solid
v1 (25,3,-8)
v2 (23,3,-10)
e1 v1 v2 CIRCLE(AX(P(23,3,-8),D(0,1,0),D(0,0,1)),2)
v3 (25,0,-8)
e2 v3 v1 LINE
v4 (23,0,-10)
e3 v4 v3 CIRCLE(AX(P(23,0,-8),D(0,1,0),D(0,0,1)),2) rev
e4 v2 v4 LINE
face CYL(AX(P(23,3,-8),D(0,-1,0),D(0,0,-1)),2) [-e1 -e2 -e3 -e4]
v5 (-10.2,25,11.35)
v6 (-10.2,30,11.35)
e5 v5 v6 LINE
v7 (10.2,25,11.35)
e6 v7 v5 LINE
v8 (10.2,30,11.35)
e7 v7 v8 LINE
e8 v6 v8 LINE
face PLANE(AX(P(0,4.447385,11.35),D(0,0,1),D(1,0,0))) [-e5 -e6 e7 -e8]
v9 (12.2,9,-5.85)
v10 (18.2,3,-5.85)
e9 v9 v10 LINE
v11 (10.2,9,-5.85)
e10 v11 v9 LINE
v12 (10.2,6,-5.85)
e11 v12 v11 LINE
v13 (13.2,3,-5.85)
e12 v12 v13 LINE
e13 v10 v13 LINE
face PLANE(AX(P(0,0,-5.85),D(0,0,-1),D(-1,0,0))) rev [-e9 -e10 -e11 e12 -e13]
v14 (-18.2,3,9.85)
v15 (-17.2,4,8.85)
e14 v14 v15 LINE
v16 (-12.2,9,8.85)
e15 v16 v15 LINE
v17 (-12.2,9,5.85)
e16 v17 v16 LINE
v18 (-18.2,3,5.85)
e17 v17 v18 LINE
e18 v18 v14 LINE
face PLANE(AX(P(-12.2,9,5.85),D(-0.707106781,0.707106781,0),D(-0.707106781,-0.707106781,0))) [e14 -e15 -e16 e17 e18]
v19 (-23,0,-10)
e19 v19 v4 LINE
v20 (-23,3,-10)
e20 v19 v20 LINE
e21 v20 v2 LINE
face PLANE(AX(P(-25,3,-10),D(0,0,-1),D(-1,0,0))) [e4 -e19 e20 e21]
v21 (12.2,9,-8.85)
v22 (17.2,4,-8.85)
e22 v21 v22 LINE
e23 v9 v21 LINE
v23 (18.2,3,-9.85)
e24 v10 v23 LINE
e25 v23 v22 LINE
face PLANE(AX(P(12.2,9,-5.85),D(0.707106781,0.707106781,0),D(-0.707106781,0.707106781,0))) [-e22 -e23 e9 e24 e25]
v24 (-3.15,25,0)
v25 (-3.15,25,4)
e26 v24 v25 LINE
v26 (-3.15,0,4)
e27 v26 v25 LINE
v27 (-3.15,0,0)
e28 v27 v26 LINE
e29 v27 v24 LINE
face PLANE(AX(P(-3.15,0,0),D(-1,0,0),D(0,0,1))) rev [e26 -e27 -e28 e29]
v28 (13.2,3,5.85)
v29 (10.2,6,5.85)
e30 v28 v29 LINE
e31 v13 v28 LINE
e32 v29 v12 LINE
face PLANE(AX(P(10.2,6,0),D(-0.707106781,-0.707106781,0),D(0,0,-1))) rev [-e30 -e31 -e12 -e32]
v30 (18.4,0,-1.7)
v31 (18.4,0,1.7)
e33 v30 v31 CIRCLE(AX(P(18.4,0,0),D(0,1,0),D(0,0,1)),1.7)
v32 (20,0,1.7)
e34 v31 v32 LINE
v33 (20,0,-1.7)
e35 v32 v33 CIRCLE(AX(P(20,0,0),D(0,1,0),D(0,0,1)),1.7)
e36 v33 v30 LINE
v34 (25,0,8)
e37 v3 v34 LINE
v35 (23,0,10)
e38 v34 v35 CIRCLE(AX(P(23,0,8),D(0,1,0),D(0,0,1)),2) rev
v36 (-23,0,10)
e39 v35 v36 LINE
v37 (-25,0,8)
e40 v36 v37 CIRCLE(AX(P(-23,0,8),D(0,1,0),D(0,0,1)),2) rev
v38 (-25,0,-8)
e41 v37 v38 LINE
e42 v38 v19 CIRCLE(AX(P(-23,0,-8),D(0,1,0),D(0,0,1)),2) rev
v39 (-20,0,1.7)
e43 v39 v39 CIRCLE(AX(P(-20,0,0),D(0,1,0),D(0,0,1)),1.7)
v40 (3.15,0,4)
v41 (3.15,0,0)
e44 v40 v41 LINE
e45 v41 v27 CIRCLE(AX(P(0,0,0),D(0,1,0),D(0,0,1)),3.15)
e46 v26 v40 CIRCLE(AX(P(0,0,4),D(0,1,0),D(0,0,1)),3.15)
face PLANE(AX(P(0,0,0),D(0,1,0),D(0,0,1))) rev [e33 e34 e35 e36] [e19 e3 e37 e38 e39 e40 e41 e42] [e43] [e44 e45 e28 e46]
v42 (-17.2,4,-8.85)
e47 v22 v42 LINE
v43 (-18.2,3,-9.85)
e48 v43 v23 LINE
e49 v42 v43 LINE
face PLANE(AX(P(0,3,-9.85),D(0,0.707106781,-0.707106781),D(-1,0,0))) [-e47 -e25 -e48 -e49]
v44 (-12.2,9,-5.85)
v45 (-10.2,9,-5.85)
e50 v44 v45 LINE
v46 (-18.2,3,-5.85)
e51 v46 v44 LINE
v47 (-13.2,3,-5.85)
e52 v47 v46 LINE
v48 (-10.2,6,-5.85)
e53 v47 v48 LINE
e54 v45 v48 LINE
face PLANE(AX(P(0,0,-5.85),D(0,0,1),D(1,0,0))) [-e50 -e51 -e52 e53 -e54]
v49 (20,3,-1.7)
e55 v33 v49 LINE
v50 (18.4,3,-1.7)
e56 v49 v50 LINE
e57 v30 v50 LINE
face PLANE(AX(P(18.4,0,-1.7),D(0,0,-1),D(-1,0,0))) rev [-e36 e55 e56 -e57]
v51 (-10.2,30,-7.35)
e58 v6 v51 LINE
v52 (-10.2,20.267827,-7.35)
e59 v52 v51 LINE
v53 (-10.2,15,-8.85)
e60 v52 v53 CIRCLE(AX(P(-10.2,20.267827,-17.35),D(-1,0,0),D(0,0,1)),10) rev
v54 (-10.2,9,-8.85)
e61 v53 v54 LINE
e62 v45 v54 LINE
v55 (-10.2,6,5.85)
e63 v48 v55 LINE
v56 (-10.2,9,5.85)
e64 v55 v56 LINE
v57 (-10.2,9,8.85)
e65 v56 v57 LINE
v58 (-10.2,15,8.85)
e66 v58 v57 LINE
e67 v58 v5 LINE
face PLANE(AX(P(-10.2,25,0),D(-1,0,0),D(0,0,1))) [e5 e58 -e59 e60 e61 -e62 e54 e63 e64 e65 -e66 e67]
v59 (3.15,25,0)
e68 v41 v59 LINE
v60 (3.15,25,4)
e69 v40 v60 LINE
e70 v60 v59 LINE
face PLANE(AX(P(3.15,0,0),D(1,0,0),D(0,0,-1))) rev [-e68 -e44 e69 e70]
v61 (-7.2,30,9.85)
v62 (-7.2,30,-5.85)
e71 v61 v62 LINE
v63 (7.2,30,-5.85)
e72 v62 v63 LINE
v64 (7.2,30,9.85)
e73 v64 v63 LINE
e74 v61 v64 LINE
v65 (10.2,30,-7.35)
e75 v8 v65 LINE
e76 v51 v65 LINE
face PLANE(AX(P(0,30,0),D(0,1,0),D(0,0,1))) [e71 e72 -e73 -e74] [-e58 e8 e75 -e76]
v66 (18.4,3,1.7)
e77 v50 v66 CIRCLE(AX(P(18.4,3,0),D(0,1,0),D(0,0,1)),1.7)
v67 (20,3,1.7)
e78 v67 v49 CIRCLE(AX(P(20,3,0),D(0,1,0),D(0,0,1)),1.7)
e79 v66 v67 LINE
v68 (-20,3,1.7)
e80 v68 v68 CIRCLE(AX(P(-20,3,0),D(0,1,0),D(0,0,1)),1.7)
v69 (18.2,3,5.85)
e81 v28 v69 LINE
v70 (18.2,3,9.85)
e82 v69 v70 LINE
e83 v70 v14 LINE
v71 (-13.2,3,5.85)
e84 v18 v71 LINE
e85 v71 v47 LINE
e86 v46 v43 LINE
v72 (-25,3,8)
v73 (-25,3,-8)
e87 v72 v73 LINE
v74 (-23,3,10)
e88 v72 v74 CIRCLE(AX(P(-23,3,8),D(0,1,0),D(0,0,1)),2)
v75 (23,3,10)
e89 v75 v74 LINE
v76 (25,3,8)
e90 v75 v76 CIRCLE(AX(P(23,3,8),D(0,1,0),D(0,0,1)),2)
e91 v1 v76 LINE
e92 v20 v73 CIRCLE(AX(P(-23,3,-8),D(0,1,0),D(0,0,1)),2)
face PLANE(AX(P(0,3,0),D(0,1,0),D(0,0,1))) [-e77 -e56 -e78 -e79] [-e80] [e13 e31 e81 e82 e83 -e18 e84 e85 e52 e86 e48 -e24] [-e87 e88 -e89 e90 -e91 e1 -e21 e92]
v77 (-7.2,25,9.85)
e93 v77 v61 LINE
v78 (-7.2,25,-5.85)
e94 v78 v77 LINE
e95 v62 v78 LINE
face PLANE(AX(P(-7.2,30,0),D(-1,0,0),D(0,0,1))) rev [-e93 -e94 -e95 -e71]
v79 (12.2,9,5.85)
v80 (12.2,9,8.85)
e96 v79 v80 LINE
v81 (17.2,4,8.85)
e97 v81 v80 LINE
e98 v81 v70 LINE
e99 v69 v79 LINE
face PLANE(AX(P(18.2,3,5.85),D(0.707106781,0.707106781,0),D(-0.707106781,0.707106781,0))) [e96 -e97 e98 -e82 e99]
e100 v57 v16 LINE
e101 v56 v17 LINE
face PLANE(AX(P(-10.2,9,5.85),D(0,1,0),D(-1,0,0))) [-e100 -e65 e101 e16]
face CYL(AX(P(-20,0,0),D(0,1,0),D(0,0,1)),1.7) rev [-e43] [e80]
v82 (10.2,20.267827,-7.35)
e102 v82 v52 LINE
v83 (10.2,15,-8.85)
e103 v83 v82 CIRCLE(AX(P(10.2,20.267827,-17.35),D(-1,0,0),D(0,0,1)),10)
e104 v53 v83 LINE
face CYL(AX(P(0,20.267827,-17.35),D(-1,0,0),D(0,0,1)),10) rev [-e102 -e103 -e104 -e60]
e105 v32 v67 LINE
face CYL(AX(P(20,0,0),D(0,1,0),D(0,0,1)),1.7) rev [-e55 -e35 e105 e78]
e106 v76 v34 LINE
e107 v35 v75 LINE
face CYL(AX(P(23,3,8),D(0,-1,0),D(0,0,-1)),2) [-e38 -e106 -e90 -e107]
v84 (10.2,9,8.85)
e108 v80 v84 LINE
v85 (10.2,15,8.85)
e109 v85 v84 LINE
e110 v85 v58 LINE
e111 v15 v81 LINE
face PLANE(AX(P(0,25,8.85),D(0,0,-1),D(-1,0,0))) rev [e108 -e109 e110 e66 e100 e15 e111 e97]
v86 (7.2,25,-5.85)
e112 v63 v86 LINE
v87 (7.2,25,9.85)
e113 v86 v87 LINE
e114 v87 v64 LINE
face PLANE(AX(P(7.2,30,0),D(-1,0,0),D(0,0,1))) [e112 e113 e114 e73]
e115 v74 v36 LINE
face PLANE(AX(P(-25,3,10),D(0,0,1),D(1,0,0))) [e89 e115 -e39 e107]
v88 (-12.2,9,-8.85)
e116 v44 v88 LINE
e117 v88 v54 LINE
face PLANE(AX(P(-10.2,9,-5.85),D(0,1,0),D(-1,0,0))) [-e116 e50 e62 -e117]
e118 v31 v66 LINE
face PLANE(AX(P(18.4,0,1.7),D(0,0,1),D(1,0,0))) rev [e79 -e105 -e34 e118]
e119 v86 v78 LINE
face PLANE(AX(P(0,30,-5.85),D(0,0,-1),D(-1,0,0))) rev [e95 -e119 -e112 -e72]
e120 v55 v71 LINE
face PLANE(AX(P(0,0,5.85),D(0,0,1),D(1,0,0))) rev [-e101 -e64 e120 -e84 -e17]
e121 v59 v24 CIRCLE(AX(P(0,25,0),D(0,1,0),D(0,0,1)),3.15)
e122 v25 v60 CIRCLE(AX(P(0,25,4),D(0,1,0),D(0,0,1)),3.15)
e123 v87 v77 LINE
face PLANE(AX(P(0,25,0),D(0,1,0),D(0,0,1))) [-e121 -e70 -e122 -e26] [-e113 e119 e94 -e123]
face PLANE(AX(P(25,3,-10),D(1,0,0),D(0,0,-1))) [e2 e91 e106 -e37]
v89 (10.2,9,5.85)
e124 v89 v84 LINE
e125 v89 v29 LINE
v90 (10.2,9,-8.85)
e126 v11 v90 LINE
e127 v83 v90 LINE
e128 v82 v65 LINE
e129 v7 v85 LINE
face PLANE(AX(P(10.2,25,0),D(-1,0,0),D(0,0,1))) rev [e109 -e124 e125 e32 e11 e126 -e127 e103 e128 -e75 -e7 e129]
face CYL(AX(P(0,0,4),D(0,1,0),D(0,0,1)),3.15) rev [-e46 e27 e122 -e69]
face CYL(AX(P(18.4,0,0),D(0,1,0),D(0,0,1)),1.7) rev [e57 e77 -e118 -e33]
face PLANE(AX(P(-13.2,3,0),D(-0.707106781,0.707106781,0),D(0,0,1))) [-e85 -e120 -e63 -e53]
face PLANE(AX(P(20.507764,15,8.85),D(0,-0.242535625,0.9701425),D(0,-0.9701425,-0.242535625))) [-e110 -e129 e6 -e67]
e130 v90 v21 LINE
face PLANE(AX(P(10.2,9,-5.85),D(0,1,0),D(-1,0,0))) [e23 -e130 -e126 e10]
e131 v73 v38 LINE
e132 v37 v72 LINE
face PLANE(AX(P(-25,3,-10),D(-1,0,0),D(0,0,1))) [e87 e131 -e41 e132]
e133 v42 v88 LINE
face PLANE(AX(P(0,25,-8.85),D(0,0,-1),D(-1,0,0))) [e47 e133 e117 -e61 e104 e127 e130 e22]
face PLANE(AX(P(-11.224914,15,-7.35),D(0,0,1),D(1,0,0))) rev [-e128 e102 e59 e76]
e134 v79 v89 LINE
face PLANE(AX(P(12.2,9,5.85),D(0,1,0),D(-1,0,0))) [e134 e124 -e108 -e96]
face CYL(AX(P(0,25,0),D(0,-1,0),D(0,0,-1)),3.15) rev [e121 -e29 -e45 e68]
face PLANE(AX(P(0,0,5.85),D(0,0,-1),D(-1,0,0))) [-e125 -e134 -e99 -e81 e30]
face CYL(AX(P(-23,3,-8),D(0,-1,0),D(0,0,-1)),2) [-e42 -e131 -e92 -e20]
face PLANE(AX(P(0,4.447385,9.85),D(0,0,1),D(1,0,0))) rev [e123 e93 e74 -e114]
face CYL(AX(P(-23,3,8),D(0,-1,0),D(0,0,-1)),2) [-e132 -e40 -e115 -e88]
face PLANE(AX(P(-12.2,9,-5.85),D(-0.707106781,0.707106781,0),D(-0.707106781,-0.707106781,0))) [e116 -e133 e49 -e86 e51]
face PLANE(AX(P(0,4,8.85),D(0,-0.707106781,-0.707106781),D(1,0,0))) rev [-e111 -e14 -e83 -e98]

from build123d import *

# Parameters (mm, degrees)
SKETCH1_W               = 20.4
SKETCH1_H               = 17.7
SKETCH1_W_2             = 14.4
SKETCH1_H_2             = 11.7
SKETCH1_R               = 3.15
BOSS_EXTRUDE1_DEPTH     = 25
SKETCH1_3_W             = 20.4
SKETCH1_3_H             = 17.7
SKETCH1_3_W_2           = 14.4
SKETCH1_3_H_2           = 11.7
BOSS_EXTRUDE2_DEPTH     = 30
SKETCH2_W               = 22.449827962
SKETCH2_H               = 3
CUT_EXTRUDE1_DEPTH      = 15
FILLET1_R               = 10
SKETCH3_W               = 50
SKETCH3_H               = 20
SKETCH3_R               = 3.15
BOSS_EXTRUDE3_DEPTH     = 3
SKETCH4_R               = 1.7
CUT_EXTRUDE2_DEPTH      = 39.13135193
BOSS_EXTRUDE4_DEPTH     = 3
BOSS_EXTRUDE5_DEPTH     = 3
CHAMFER1_SIZE           = 3
CHAMFER2_SIZE           = 1
FILLET3_R               = 2
SKETCH7_W               = 14.4
SKETCH7_H               = 3
CUT_EXTRUDE3_DEPTH      = 5
BOSS_EXTRUDE6_DEPTH     = 5
CUT_EXTRUDE4_DEPTH      = 38.132499243
CUT_EXTRUDE4_DEPTH_BACK = 38.132499243
BOSS_EXTRUDE7_DEPTH     = 20.4


with BuildPart() as part:
    # Sketch1 → Boss-Extrude1 (new body)
    # profile 1 of 2: a face of its own
    with BuildSketch(Plane(origin=(0, 0, 0), x_dir=(1, 0, 0), z_dir=(0, 1, 0))):
        Rectangle(SKETCH1_W, SKETCH1_H)
        Rectangle(SKETCH1_W_2, SKETCH1_H_2, mode=Mode.SUBTRACT)
    # profile 2 of 2: a face of its own
    with BuildSketch(Plane(origin=(0, 0, 0), x_dir=(1, 0, 0), z_dir=(0, 1, 0))):
        Rectangle(SKETCH1_W_2, SKETCH1_H_2)
        with Locations(Location((0, 0, 0), (0, 0, 270))):
            Circle(SKETCH1_R, mode=Mode.SUBTRACT)
    extrude(amount=BOSS_EXTRUDE1_DEPTH)

    # Sketch1<3> → Boss-Extrude2 (add)
    with BuildSketch(Plane(origin=(0, 0, 0), x_dir=(1, 0, 0), z_dir=(0, 1, 0))):
        Rectangle(SKETCH1_3_W, SKETCH1_3_H)
        Rectangle(SKETCH1_3_W_2, SKETCH1_3_H_2, mode=Mode.SUBTRACT)
    extrude(amount=BOSS_EXTRUDE2_DEPTH)

    # Sketch2 → Cut-Extrude1 (cut)
    with BuildSketch(Plane(origin=(0, 30, 0), x_dir=(1, 0, 0), z_dir=(0, 1, 0))):
        with Locations((0, 8.85)):
            Rectangle(SKETCH2_W, SKETCH2_H)
    extrude(amount=-CUT_EXTRUDE1_DEPTH, mode=Mode.SUBTRACT)

    # Fillet1
    # the kernel refuses this fillet: 10 mm, written as the material it adds along each edge
    with BuildSketch(Plane(origin=(10.2, 15, -7.35), x_dir=(0, 1, 0), z_dir=(-1, 0, 0))) as fillet1_piece_1:
        with BuildLine():
            CenterArc((5.267826876, 10), FILLET1_R, 238.211669383, 31.788330617)
            Line((0, 1.5), (-0.105356538, 1.33))
            ThreePointArc((-0.105356538, 1.33), (-0.2, 0.75), (-0.2, 0))
            Line((-0.2, 0), (0, -0.2))
            Line((0, -0.2), (5.267826876, -0.2))
            Line((5.267826876, -0.2), (5.267826876, 0))
        make_face()
    extrude(amount=20.4)

    # Sketch3 → Boss-Extrude3 (add)
    with BuildSketch(Plane.XZ):
        Rectangle(SKETCH3_W, SKETCH3_H)
        with Locations(Location((0, 0, 0), (0, 0, 90))):
            Circle(SKETCH3_R, mode=Mode.SUBTRACT)
    extrude(amount=-BOSS_EXTRUDE3_DEPTH)

    # Sketch4 → Cut-Extrude2 (cut, through all)
    with BuildSketch(Plane(origin=(0, 3, 0), x_dir=(1, 0, 0), z_dir=(0, 1, 0))):
        with Locations(Location((-20, 0, 0), (0, 0, 270))):
            Circle(SKETCH4_R)
        with BuildLine():
            Line((18.4, 1.7), (20, 1.7))
            ThreePointArc((20, 1.7), (21.7, 0), (20, -1.7))
            Line((20, -1.7), (18.4, -1.7))
            ThreePointArc((18.4, -1.7), (16.7, 0), (18.4, 1.7))
        make_face()
    extrude(amount=-CUT_EXTRUDE2_DEPTH, mode=Mode.SUBTRACT)

    # Sketch5 → Boss-Extrude4 (add)
    with BuildSketch(Plane(origin=(0, 0, -8.85), x_dir=(-1, 0, 0), z_dir=(0, 0, -1))):
        Polygon((-10.2, 3), (-10.2, 9), (-12.2, 9), (-18.2, 3), align=None)
        Polygon((18.2, 3), (10.2, 3), (10.2, 9), (12.2, 9), align=None)
    extrude(amount=-BOSS_EXTRUDE4_DEPTH)

    # Sketch6 → Boss-Extrude5 (add)
    with BuildSketch(Plane.XY.offset(8.85)):
        Polygon((-18.2, 3), (-10.2, 3), (-10.2, 9), (-12.2, 9), align=None)
        Polygon((10.2, 9), (10.2, 3), (18.2, 3), (12.2, 9), align=None)
    extrude(amount=-BOSS_EXTRUDE5_DEPTH)

    # Chamfer1
    chamfer1_edges = [part.edges().sort_by_distance(p)[0] for p in [
        (-10.2, 3, 0),
        (10.2, 3, 0),
    ]]
    chamfer(chamfer1_edges, length=CHAMFER1_SIZE)

    # Chamfer2
    chamfer2_edges = [part.edges().sort_by_distance(p)[0] for p in [
        (0, 3, -8.85),
        (0, 3, 8.85),
    ]]
    chamfer(chamfer2_edges, length=CHAMFER2_SIZE)

    # Fillet3
    fillet3_edges = [part.edges().sort_by_distance(p)[0] for p in [
        (25, 1.5, 10),
        (25, 1.5, -10),
        (-25, 1.5, -10),
        (-25, 1.5, 10),
    ]]
    fillet(fillet3_edges, radius=FILLET3_R)

    # Sketch7 → Cut-Extrude3 (cut)
    with BuildSketch(Plane(origin=(0, 30, 0), x_dir=(1, 0, 0), z_dir=(0, 1, 0))):
        with Locations((0, -7.35)):
            Rectangle(SKETCH7_W, SKETCH7_H)
    extrude(amount=-CUT_EXTRUDE3_DEPTH, mode=Mode.SUBTRACT)

    # Sketch7<3> → Boss-Extrude6 (add)
    with BuildSketch(Plane(origin=(0, 30, 0), x_dir=(1, 0, 0), z_dir=(0, 1, 0))):
        Polygon((-7.2, -9.85), (-7.2, -8.85), (-10.2, -8.85), (-10.2, -11.35), (10.2, -11.35), (10.2, -8.85), (7.2, -8.85), (7.2, -9.85), align=None)
    extrude(amount=-BOSS_EXTRUDE6_DEPTH)

    # Sketch8 → Cut-Extrude4 (cut, two sides: drawn at the far end of the back side and taken through both)
    with BuildSketch(Plane(origin=(0, 25, 0), x_dir=(1, 0, 0), z_dir=(0, 1, 0)).offset(-CUT_EXTRUDE4_DEPTH_BACK)):
        with BuildLine():
            Line((3.15, 0), (3.15, -4))
            ThreePointArc((3.15, -4), (0, -7.15), (-3.15, -4))
            Line((-3.15, -4), (-3.15, 0))
            ThreePointArc((-3.15, 0), (0, 3.15), (3.15, 0))
        make_face()
    extrude(amount=CUT_EXTRUDE4_DEPTH + CUT_EXTRUDE4_DEPTH_BACK, mode=Mode.SUBTRACT)

    # Sketch9 → Boss-Extrude7 (add)
    with BuildSketch(Plane.ZY.offset(10.2)):
        Polygon((11.35, 25), (8.85, 25), (8.85, 15), align=None)
    extrude(amount=-BOSS_EXTRUDE7_DEPTH)


solid = part.part
